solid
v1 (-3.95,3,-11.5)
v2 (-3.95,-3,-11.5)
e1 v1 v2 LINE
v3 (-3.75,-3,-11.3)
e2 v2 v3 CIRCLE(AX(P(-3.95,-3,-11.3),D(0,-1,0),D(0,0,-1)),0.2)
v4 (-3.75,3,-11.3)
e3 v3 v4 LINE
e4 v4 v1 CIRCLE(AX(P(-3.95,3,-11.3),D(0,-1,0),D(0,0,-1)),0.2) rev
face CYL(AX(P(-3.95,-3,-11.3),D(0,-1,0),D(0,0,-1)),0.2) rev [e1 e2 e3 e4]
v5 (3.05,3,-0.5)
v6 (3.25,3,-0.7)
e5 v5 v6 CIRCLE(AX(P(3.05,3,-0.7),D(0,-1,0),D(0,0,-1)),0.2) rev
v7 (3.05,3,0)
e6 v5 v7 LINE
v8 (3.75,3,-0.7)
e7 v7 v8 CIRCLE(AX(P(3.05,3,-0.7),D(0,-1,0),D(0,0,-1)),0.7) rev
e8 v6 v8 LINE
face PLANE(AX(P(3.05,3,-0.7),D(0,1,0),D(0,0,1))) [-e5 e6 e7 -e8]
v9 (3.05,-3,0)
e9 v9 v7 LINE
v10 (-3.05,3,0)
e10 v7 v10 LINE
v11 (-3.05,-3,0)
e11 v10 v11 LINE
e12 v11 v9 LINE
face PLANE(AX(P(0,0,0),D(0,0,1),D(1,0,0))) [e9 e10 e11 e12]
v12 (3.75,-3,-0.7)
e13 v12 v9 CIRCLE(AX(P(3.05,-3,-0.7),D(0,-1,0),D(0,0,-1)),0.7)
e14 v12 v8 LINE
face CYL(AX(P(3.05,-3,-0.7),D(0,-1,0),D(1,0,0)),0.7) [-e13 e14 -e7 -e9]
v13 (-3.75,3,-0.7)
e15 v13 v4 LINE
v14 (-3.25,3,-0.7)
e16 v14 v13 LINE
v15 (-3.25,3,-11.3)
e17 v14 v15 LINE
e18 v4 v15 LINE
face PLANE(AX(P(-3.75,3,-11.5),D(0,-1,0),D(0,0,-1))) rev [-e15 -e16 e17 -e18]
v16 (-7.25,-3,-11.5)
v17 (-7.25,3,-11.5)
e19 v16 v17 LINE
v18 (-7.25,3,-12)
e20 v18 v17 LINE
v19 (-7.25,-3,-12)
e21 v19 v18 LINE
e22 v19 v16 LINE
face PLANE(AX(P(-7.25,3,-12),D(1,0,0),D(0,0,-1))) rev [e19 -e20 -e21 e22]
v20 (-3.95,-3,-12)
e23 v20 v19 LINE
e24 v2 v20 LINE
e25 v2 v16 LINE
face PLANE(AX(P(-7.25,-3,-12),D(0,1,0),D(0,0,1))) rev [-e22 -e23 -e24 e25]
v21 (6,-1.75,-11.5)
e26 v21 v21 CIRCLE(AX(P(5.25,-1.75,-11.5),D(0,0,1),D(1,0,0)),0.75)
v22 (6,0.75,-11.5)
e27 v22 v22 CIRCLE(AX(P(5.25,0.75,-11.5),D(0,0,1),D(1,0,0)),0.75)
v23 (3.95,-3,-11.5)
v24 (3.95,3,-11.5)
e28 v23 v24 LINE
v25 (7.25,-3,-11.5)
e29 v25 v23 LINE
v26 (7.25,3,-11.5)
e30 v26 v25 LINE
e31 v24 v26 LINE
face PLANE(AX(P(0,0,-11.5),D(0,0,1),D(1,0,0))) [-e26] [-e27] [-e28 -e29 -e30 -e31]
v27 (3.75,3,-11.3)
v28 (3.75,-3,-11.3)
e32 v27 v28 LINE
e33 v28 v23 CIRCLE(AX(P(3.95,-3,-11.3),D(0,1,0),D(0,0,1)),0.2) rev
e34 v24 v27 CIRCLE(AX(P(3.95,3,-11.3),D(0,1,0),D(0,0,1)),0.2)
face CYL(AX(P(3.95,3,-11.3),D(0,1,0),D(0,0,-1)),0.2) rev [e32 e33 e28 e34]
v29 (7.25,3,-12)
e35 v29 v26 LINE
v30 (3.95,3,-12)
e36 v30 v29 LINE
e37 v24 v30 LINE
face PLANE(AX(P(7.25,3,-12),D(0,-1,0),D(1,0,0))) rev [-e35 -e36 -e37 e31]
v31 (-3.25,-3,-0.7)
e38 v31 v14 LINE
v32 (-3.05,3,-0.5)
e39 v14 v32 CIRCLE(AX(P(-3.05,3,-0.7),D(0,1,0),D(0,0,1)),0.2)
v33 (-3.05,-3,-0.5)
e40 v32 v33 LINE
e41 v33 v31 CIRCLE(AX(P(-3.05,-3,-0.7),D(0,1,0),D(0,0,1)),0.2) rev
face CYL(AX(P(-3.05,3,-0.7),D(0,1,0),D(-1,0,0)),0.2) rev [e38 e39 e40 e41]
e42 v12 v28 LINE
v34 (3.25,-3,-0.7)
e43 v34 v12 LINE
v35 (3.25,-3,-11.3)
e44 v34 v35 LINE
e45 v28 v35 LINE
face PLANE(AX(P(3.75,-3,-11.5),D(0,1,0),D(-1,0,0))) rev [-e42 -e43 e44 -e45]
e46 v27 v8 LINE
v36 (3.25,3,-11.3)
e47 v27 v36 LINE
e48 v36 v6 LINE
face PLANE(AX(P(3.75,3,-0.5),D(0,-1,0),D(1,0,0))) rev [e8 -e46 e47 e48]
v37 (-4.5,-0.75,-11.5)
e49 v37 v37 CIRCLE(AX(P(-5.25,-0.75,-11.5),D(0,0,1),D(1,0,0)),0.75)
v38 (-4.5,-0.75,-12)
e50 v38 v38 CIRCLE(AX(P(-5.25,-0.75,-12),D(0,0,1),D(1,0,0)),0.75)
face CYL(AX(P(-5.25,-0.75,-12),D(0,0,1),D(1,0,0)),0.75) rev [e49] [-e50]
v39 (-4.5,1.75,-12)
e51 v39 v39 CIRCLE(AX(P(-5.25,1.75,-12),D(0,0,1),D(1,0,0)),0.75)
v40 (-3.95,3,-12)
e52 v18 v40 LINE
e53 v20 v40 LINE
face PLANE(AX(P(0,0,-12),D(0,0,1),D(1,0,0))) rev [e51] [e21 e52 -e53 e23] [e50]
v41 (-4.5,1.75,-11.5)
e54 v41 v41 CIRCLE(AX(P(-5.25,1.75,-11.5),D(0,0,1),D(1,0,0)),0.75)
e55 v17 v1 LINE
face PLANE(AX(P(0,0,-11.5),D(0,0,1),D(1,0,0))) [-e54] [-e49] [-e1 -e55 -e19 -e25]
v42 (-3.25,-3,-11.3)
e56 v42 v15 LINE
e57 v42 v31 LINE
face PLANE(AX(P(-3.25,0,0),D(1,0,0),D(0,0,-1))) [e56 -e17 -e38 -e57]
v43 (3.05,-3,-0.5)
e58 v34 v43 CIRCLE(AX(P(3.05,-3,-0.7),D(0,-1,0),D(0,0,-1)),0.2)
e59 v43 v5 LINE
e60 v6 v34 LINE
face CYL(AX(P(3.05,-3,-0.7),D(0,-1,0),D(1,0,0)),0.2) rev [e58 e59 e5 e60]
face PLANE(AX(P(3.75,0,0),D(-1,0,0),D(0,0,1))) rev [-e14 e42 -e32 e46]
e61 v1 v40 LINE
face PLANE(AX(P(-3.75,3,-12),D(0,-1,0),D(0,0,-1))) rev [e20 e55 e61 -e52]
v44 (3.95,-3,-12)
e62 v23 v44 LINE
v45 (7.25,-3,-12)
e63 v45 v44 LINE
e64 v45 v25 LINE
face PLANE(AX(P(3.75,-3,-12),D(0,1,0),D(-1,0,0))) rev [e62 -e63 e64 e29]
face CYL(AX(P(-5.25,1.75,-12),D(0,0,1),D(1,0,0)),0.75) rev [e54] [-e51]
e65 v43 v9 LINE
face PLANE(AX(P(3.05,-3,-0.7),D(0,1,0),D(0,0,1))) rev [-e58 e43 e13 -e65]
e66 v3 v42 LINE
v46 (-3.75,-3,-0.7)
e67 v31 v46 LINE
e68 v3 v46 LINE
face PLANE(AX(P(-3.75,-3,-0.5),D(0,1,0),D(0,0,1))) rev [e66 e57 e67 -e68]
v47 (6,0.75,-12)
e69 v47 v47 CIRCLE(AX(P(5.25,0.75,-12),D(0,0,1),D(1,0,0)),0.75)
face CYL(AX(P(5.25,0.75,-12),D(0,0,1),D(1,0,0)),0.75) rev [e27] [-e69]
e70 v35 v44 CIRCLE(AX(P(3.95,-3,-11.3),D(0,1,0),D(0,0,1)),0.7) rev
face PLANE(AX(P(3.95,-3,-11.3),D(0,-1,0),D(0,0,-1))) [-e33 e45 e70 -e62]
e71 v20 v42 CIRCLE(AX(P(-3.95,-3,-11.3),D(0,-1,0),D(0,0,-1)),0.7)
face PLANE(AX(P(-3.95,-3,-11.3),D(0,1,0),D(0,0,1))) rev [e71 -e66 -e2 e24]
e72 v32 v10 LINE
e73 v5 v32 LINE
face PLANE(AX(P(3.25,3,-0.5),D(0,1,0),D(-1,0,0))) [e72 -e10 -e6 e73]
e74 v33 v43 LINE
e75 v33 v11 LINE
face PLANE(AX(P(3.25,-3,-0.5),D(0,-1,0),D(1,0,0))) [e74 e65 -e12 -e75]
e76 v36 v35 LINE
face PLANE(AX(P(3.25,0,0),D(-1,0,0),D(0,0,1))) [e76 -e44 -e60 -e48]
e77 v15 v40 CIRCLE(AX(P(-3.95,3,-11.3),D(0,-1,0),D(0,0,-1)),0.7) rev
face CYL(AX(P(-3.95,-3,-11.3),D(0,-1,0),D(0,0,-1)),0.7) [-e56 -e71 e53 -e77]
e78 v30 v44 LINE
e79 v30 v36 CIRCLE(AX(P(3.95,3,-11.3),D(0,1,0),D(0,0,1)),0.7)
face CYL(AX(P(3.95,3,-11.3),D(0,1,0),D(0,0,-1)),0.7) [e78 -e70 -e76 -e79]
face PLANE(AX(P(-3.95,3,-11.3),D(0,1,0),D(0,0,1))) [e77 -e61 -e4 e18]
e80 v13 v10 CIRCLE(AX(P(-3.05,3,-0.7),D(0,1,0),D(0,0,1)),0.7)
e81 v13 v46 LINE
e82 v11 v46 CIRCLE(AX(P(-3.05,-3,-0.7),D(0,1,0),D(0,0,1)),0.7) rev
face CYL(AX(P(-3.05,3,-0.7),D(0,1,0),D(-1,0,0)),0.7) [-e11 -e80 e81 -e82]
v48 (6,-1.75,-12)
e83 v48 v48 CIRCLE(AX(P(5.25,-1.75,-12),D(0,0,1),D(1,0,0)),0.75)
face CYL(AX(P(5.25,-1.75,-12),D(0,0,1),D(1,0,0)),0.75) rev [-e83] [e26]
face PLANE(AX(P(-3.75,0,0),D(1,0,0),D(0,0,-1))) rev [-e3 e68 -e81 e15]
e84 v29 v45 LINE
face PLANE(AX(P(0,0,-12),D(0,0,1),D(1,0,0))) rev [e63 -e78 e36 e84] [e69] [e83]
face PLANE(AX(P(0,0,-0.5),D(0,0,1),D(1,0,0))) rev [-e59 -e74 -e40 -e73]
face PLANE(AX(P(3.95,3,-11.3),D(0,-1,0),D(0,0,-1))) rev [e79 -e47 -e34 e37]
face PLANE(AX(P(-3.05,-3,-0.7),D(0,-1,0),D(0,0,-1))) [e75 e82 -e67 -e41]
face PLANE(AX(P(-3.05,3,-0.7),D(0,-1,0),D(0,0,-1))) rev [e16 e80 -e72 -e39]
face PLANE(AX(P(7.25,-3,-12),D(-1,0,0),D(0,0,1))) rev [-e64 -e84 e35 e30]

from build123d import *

# Parameters (mm, degrees)
SCHIZZO1_W                       = 6.5
SCHIZZO1_H                       = 6
BASE_FLANGIA1_DEPTH              = 0.5
BORDO_FLANGIA1_STRIP_W           = 2.4
BORDO_FLANGIA1_STRIP_H           = 0.5
BORDO_FLANGIA1_STRIP_CUT_DEPTH   = 6
BORDO_FLANGIA1_STRIP_2_W         = 2.4
BORDO_FLANGIA1_STRIP_2_H         = 0.5
BORDO_FLANGIA1_STRIP_CUT_2_DEPTH = 6
BORDO_FLANGIA1_DEPTH             = 6
BORDO_FLANGIA1_BEND_DEPTH        = 6
BORDO_FLANGIA2_STRIP_W           = 2.4
BORDO_FLANGIA2_STRIP_H           = 0.5
BORDO_FLANGIA2_STRIP_CUT_DEPTH   = 6
BORDO_FLANGIA2_STRIP_2_W         = 2.4
BORDO_FLANGIA2_STRIP_2_H         = 0.5
BORDO_FLANGIA2_STRIP_CUT_2_DEPTH = 6
BORDO_FLANGIA2_DEPTH             = 6
BORDO_FLANGIA2_BEND_DEPTH        = 6
SCHIZZO18_R                      = 0.75
TAGLIO_ESTRUSIONE1_DEPTH         = 14.921655792
SCHIZZO22_R                      = 0.75
TAGLIO_ESTRUSIONE2_DEPTH         = 14.921655792


# Sheet-metal steps are written as plain solids
with BuildPart() as part:
    # Schizzo1 → Base-Flangia1 (new body)
    with BuildSketch(Plane.XY):
        Rectangle(SCHIZZO1_W, SCHIZZO1_H)
    extrude(amount=-BASE_FLANGIA1_DEPTH)

    # Bordo-Flangia1 strip (across the edge) → Bordo-Flangia1 strip cut (cut)
    with BuildSketch(Plane(origin=(-3.25, -3, -0.5), x_dir=(1, 0, 0), z_dir=(0, 1, 0))):
        with Locations((-1, -0.25)):
            Rectangle(BORDO_FLANGIA1_STRIP_W, BORDO_FLANGIA1_STRIP_H)
    extrude(amount=BORDO_FLANGIA1_STRIP_CUT_DEPTH, mode=Mode.SUBTRACT)

    # Bordo-Flangia1 strip 2 (across the edge) → Bordo-Flangia1 strip cut 2 (cut)
    with BuildSketch(Plane(origin=(3.25, 3, -0.5), x_dir=(-1, 0, 0), z_dir=(0, -1, 0))):
        with Locations((-1, -0.25)):
            Rectangle(BORDO_FLANGIA1_STRIP_2_W, BORDO_FLANGIA1_STRIP_2_H)
    extrude(amount=BORDO_FLANGIA1_STRIP_CUT_2_DEPTH, mode=Mode.SUBTRACT)

    # Bordo-Flangia1 section (across the edge) → Bordo-Flangia1 (add)
    with BuildSketch(Plane(origin=(-3.25, -3, -0.5), x_dir=(1, 0, 0), z_dir=(0, 1, 0))):
        with BuildLine():
            Line((-0.5, 0.2), (-0.5, 11))
            Line((-0.5, 11), (0, 11))
            Line((0, 11), (0, 0.2))
            ThreePointArc((0, 0.2), (0.058578644, 0.058578644), (0.2, 0))
            Line((0.2, 0), (0.2, -0.5))
            ThreePointArc((0.2, -0.5), (-0.294974747, -0.294974747), (-0.5, 0.2))
        make_face()
    extrude(amount=BORDO_FLANGIA1_DEPTH)

    # Bordo-Flangia1 section 2 (across the edge) → Bordo-Flangia1 bend (add)
    with BuildSketch(Plane(origin=(3.25, 3, -0.5), x_dir=(-1, 0, 0), z_dir=(0, -1, 0))):
        with BuildLine():
            Line((-0.5, 0.2), (-0.5, 11))
            Line((-0.5, 11), (0, 11))
            Line((0, 11), (0, 0.2))
            ThreePointArc((0, 0.2), (0.058578644, 0.058578644), (0.2, 0))
            Line((0.2, 0), (0.2, -0.5))
            ThreePointArc((0.2, -0.5), (-0.294974747, -0.294974747), (-0.5, 0.2))
        make_face()
    extrude(amount=BORDO_FLANGIA1_BEND_DEPTH)

    # Bordo-Flangia2 strip (across the edge) → Bordo-Flangia2 strip cut (cut)
    with BuildSketch(Plane(origin=(-3.75, 3, -11.5), x_dir=(0, 0, 1), z_dir=(0, -1, 0))):
        with Locations((-1, -0.25)):
            Rectangle(BORDO_FLANGIA2_STRIP_W, BORDO_FLANGIA2_STRIP_H)
    extrude(amount=BORDO_FLANGIA2_STRIP_CUT_DEPTH, mode=Mode.SUBTRACT)

    # Bordo-Flangia2 strip 2 (across the edge) → Bordo-Flangia2 strip cut 2 (cut)
    with BuildSketch(Plane(origin=(3.75, -3, -11.5), x_dir=(0, 0, 1), z_dir=(0, 1, 0))):
        with Locations((-1, -0.25)):
            Rectangle(BORDO_FLANGIA2_STRIP_2_W, BORDO_FLANGIA2_STRIP_2_H)
    extrude(amount=BORDO_FLANGIA2_STRIP_CUT_2_DEPTH, mode=Mode.SUBTRACT)

    # Bordo-Flangia2 section (across the edge) → Bordo-Flangia2 (add)
    with BuildSketch(Plane(origin=(-3.75, 3, -11.5), x_dir=(0, 0, 1), z_dir=(0, -1, 0))):
        with BuildLine():
            Line((-0.5, 0.2), (-0.5, 3.5))
            Line((-0.5, 3.5), (0, 3.5))
            Line((0, 3.5), (0, 0.2))
            ThreePointArc((0, 0.2), (0.058578644, 0.058578644), (0.2, 0))
            Line((0.2, 0), (0.2, -0.5))
            ThreePointArc((0.2, -0.5), (-0.294974747, -0.294974747), (-0.5, 0.2))
        make_face()
    extrude(amount=BORDO_FLANGIA2_DEPTH)

    # Bordo-Flangia2 section 2 (across the edge) → Bordo-Flangia2 bend (add)
    with BuildSketch(Plane(origin=(3.75, -3, -11.5), x_dir=(0, 0, 1), z_dir=(0, 1, 0))):
        with BuildLine():
            Line((-0.5, 0.2), (-0.5, 3.5))
            Line((-0.5, 3.5), (0, 3.5))
            Line((0, 3.5), (0, 0.2))
            ThreePointArc((0, 0.2), (0.058578644, 0.058578644), (0.2, 0))
            Line((0.2, 0), (0.2, -0.5))
            ThreePointArc((0.2, -0.5), (-0.294974747, -0.294974747), (-0.5, 0.2))
        make_face()
    extrude(amount=BORDO_FLANGIA2_BEND_DEPTH)

    # Schizzo18 → Taglio-Estrusione1 (cut, through all)
    with BuildSketch(Plane.XY.offset(-11.5)):
        with Locations((5.25, 0.75)):
            Circle(SCHIZZO18_R)
        with Locations((5.25, -1.75)):
            Circle(SCHIZZO18_R)
    extrude(amount=-TAGLIO_ESTRUSIONE1_DEPTH, mode=Mode.SUBTRACT)

    # Schizzo22 → Taglio-Estrusione2 (cut, through all)
    with BuildSketch(Plane.XY.offset(-11.5)):
        with Locations((-5.25, 1.75)):
            Circle(SCHIZZO22_R)
        with Locations((-5.25, -0.75)):
            Circle(SCHIZZO22_R)
    extrude(amount=-TAGLIO_ESTRUSIONE2_DEPTH, mode=Mode.SUBTRACT)


solid = part.part
